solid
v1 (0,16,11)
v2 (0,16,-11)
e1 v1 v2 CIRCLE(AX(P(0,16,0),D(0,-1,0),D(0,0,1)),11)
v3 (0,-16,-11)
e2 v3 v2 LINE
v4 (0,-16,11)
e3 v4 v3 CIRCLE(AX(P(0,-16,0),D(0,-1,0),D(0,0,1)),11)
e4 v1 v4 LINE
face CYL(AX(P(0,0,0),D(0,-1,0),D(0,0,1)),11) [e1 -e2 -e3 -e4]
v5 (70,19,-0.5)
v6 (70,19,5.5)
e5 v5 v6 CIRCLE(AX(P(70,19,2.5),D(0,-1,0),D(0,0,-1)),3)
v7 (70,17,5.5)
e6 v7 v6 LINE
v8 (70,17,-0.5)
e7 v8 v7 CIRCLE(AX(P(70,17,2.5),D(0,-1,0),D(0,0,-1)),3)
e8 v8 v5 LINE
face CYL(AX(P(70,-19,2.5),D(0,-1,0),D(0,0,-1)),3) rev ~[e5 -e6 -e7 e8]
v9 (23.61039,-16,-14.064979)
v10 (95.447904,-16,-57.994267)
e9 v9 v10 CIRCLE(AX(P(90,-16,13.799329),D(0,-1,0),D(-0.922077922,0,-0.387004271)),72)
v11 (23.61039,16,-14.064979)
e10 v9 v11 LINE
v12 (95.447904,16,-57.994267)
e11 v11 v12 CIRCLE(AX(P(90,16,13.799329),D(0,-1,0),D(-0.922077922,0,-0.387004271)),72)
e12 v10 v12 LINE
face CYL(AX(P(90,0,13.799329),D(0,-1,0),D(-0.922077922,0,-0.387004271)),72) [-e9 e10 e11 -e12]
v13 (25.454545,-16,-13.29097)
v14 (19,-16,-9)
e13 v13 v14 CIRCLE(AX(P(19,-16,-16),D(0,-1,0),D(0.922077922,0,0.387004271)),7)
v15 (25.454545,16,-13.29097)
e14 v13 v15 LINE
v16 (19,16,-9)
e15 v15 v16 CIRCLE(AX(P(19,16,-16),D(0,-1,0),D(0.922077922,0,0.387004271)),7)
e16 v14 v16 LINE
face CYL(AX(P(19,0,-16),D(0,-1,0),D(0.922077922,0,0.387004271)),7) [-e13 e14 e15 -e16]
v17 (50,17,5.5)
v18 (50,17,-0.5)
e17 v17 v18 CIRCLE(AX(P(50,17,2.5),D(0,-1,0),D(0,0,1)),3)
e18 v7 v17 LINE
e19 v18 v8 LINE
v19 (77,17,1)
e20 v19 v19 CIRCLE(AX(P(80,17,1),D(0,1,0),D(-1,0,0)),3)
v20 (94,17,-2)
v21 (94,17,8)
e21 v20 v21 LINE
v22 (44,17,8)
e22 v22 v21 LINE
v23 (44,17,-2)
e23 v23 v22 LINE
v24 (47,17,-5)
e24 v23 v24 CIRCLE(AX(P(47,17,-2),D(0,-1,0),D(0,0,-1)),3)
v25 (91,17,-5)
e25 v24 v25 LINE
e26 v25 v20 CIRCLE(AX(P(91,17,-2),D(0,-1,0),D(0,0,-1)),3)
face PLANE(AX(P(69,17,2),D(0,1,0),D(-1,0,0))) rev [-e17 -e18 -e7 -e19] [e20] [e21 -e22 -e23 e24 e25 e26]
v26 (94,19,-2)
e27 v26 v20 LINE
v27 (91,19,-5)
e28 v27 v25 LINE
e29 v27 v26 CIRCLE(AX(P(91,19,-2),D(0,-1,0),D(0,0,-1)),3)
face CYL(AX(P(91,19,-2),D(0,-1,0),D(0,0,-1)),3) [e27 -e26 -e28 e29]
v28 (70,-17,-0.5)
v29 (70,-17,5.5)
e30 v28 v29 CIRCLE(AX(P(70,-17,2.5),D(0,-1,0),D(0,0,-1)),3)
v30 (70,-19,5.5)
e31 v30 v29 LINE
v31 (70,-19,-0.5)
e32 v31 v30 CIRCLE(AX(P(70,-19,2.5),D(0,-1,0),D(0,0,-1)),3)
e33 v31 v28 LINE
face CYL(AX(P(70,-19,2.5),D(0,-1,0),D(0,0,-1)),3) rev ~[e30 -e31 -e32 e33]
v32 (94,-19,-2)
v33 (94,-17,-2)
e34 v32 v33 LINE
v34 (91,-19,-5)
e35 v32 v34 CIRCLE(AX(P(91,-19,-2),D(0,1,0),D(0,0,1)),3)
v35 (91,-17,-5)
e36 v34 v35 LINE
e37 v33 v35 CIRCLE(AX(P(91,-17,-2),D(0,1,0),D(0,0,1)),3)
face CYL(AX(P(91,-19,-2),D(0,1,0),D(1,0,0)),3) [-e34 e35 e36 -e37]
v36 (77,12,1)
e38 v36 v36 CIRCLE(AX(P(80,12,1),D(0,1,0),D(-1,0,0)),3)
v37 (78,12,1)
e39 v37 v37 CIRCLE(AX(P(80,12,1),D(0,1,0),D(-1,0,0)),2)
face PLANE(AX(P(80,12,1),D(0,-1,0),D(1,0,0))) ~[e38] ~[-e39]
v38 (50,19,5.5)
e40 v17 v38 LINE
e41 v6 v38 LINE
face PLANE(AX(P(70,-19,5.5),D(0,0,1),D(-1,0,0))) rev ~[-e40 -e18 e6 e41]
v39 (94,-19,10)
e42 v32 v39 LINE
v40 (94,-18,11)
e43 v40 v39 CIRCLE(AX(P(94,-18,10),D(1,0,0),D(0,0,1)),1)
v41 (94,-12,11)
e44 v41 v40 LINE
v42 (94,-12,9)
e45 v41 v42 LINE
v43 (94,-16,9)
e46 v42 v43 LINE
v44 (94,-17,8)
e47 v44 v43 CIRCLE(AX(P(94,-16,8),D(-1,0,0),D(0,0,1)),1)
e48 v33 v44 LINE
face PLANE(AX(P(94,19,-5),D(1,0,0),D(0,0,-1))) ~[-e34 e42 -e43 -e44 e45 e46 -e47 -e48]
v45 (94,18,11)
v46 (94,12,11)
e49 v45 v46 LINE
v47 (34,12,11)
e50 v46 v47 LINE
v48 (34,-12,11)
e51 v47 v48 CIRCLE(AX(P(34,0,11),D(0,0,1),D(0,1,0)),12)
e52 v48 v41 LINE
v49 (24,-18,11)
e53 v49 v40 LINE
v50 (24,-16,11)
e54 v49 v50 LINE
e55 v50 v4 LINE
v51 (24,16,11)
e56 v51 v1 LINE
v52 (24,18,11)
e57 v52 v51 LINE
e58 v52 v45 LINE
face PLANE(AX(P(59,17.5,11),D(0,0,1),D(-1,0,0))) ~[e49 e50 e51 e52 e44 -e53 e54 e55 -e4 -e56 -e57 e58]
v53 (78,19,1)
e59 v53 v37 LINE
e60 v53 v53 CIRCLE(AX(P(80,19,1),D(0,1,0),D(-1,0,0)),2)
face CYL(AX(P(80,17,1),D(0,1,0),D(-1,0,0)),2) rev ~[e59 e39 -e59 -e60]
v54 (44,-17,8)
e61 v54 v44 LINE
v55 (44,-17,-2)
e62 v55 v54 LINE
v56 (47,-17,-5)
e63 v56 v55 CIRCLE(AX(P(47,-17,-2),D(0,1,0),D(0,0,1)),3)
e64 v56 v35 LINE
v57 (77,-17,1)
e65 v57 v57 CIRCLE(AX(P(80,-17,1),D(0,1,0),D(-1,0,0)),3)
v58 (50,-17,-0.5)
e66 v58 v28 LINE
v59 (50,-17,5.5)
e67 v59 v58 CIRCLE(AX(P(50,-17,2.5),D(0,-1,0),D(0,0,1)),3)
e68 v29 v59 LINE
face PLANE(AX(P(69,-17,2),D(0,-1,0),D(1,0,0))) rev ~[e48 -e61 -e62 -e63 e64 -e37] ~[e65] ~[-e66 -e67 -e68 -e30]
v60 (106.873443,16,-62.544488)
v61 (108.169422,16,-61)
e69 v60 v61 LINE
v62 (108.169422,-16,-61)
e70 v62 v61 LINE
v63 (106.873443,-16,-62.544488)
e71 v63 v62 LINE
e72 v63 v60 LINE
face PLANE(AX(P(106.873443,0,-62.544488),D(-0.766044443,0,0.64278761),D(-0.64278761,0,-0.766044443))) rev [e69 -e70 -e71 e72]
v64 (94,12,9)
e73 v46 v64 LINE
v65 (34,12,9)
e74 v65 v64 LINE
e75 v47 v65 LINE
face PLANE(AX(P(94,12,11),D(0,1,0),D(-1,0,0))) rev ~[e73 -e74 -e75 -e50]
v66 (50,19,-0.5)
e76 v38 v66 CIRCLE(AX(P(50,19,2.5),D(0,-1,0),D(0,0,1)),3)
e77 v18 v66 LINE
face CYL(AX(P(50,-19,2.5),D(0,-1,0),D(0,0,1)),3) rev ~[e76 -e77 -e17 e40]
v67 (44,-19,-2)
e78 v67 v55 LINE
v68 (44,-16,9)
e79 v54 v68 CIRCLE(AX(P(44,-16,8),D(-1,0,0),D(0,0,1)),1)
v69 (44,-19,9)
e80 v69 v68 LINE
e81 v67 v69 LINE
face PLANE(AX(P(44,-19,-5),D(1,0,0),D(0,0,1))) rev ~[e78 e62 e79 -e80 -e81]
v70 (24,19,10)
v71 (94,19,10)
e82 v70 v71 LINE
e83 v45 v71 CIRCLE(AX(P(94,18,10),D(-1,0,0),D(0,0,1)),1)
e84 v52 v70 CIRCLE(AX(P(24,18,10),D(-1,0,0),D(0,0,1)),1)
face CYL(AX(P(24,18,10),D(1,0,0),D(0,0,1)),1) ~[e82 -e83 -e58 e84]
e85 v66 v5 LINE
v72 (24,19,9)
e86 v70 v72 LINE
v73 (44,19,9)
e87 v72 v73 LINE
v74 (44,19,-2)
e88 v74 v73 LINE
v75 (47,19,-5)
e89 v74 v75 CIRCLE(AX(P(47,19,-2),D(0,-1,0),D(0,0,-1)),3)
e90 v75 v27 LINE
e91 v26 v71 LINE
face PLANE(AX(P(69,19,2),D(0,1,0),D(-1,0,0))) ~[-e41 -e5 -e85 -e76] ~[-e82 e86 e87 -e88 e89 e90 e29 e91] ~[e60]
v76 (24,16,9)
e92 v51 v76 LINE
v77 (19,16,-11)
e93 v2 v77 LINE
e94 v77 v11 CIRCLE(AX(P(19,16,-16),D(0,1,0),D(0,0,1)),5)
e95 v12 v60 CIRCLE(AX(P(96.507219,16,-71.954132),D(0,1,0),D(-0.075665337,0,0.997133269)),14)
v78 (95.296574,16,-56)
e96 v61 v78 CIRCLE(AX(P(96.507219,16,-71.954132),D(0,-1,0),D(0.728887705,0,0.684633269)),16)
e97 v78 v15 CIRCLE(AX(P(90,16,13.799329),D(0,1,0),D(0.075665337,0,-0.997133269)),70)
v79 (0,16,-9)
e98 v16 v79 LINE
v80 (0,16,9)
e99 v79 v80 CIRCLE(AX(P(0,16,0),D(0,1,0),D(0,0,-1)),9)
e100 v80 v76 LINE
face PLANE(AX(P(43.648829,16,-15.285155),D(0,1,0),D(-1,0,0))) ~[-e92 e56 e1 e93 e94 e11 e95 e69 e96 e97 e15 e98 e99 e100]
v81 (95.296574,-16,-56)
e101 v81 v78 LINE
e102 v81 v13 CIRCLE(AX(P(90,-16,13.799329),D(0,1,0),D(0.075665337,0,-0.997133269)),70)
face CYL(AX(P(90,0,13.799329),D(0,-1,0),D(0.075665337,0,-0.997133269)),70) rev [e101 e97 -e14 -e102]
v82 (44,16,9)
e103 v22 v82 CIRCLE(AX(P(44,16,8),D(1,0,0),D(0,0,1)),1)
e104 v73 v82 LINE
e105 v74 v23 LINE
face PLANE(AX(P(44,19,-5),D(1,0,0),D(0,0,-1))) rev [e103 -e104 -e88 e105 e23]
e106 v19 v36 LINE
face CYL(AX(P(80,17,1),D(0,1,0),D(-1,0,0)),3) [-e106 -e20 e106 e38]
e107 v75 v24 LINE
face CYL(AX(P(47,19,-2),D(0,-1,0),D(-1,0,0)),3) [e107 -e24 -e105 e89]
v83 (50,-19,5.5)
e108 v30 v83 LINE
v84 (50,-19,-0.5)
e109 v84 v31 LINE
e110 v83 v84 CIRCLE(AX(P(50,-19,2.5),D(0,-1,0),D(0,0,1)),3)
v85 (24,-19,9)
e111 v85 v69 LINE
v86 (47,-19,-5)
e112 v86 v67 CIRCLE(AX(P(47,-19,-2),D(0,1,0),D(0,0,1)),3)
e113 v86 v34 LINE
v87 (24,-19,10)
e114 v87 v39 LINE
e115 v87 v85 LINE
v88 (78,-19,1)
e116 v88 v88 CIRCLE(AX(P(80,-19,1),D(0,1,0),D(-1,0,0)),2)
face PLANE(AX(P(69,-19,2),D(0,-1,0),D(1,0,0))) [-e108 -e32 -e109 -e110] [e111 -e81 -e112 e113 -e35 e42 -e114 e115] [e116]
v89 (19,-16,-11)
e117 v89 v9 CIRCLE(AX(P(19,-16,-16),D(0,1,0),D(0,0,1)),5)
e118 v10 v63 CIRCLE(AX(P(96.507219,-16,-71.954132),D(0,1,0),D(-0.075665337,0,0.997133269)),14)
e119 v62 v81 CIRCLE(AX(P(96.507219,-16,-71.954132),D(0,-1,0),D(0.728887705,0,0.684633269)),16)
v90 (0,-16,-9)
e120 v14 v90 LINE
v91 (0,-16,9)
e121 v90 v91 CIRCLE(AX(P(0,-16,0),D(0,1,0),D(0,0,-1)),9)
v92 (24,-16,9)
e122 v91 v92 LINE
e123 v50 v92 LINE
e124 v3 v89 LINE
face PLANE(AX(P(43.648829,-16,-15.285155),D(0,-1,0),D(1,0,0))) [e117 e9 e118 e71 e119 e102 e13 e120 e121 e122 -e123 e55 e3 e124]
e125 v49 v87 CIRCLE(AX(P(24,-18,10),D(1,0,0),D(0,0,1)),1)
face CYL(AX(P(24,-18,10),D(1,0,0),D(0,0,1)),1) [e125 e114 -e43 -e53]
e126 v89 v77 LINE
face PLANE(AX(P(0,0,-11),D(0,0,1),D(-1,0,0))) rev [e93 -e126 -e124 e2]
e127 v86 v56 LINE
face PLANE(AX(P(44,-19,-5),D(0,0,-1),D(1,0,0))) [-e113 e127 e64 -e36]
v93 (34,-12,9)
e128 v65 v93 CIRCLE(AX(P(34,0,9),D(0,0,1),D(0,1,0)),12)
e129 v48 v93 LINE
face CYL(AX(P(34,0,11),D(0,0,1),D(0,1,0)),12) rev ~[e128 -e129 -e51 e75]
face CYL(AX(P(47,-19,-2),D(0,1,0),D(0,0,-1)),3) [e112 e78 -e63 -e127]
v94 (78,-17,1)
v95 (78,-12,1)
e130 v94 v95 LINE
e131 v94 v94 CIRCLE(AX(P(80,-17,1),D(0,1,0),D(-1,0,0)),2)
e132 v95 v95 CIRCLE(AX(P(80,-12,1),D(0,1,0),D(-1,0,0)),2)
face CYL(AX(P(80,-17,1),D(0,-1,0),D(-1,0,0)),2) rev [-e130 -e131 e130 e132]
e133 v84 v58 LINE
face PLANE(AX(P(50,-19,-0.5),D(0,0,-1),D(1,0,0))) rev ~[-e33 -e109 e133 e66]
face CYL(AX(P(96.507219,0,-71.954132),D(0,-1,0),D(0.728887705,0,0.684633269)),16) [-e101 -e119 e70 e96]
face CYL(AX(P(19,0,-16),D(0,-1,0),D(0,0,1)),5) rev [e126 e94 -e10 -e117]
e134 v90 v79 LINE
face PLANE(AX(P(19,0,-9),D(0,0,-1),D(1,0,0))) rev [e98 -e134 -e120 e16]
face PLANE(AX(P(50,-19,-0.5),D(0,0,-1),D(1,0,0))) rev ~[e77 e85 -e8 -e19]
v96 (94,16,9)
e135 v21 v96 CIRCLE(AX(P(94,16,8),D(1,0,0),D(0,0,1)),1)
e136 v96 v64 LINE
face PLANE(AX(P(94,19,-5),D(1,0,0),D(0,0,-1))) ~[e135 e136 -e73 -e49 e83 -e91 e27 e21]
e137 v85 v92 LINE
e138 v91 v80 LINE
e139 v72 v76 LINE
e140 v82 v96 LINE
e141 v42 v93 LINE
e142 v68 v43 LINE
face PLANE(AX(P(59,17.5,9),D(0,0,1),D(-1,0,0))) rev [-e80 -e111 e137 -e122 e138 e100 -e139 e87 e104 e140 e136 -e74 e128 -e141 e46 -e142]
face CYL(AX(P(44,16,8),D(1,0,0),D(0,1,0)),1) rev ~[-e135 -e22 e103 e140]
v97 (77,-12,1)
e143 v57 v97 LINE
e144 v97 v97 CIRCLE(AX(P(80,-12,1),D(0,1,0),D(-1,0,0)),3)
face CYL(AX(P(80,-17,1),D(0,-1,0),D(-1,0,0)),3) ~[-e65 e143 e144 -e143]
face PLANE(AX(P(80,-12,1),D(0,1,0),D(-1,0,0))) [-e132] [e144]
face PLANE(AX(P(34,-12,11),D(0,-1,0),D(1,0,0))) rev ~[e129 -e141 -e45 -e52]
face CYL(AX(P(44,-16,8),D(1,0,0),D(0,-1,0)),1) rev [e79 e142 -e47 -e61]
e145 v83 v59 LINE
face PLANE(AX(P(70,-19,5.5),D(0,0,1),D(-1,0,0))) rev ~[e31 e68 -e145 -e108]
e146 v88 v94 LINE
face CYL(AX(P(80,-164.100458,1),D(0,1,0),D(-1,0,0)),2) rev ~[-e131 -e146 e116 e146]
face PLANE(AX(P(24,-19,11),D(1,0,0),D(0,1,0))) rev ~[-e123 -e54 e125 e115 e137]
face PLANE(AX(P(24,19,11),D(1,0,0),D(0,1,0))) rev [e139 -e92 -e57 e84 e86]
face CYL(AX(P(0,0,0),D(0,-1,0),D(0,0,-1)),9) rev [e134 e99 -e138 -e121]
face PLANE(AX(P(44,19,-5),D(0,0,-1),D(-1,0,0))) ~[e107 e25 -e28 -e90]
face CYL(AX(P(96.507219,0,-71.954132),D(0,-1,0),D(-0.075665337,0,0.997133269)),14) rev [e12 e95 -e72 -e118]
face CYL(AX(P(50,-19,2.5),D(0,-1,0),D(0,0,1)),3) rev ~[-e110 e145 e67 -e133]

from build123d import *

# Parameters (mm, degrees)
F1_DEPTH  = 16
F2_W      = 70
F2_H      = 3
F3_DEPTH  = 2
F4_W      = 50
F4_H      = 14
F5_DEPTH  = 2
F6_R      = 1
F9_DEPTH  = 4
F11_DEPTH = 38.001
F13_D     = 4
F14_R     = 3
F14_R_2   = 2
F15_DEPTH = 5
F16_R     = 3


# Not quite as in the source:
# - a pattern or mirror of a feature is missing from the dataset's text; its kind, count and spacing are read off the source's solid


with BuildPart() as f1:
    # F0 (on Front) → F1 (new body)
    with BuildSketch(Plane.XZ):
        with BuildLine():
            Line((94, 11), (0, 11))
            ThreePointArc((0, 11), (-11, 0), (0, -11))
            Line((0, -11), (19, -11))
            ThreePointArc((19, -11), (21.7681124643, -11.8361612201), (23.6103896104, -14.064978646))
            ThreePointArc((23.6103896104, -14.064978646), (52.4378053116, -47.6260855158), (95.4479042723, -57.9942665386))
            ThreePointArc((95.4479042723, -57.9942665386), (101.6870615127, -58.9476250352), (106.8734428361, -62.5444881493))
            Line((106.8734428361, -62.5444881493), (108.1694222725, -61))
            ThreePointArc((108.1694222725, -61), (102.3002117906, -57.039668375), (95.2965735981, -56))
            ThreePointArc((95.2965735981, -56), (53.4811996085, -45.9198240056), (25.4545454545, -13.2909701044))
            ThreePointArc((25.4545454545, -13.2909701044), (22.87535745, -10.1706257081), (19, -9))
            Line((19, -9), (0, -9))
            ThreePointArc((0, -9), (-9, 0), (0, 9))
            Line((0, 9), (94, 9))
            Line((94, 9), (94, 11))
        make_face()
    extrude(amount=F1_DEPTH)

    # F2 (on face) → F3 (join)
    with BuildSketch(Plane.XY.offset(11)):
        with Locations((59, -17.5)):
            Rectangle(F2_W, F2_H)
    extrude(amount=-F3_DEPTH)

    # F4 (on face) → F5 (join)
    with BuildSketch(Plane.XZ.offset(19)):
        with Locations((69, 2)):
            Rectangle(F4_W, F4_H)
    extrude(amount=-F5_DEPTH)

    # F6
    f6_edges = [f1.edges().sort_by_distance(p)[0] for p in [
        (59, -19, 11),
        (69, -17, 9),
    ]]
    fillet(f6_edges, radius=F6_R)

    # F7: F1 across plane


with BuildPart() as f1_1:
    add(f1.part)
    add(f1.part.mirror(Plane.XZ))

    # F8 (on face) → F9 (cut)
    with BuildSketch(Plane.XY.offset(11)):
        with BuildLine():
            Line((94, 12), (34, 12))
            ThreePointArc((34, 12), (22, 0), (34, -12))
            Line((34, -12), (94, -12))
            Line((94, -12), (94, 12))
        make_face()
    extrude(amount=-F9_DEPTH, mode=Mode.SUBTRACT)

    # F10 (on face) → F11 (cut, through all)
    with BuildSketch(Plane.XZ.offset(19)):
        with BuildLine():
            ThreePointArc((70, -0.5), (73, 2.5), (70, 5.5))
            Line((70, 5.5), (50, 5.5))
            ThreePointArc((50, 5.5), (47, 2.5), (50, -0.5))
            Line((50, -0.5), (70, -0.5))
        make_face()
    extrude(amount=-F11_DEPTH, mode=Mode.SUBTRACT)

    # F13 (through all)
    with Locations(Plane.XZ.offset(19)):
        with Locations((80, 1)):
            Hole(F13_D / 2)

    # F14 (on face) → F15 (join)
    with BuildSketch(Plane(origin=(0, -17, 0), x_dir=(-1, 0, 0), z_dir=(0, 1, 0))):
        with Locations((-80, 1)):
            Circle(F14_R)
        with Locations((-80, 1)):
            Circle(F14_R_2, mode=Mode.SUBTRACT)
    f15 = extrude(amount=F15_DEPTH)

    # F15_copies: F15 across plane
    add(f15.mirror(Plane.ZX))

    # F16
    f16_edges = [f1_1.edges().sort_by_distance(p)[0] for p in [
        (94, 18, -5),
        (44, 18, -5),
        (94, -18, -5),
        (44, -18, -5),
    ]]
    fillet(f16_edges, radius=F16_R)


solid = f1_1.part
